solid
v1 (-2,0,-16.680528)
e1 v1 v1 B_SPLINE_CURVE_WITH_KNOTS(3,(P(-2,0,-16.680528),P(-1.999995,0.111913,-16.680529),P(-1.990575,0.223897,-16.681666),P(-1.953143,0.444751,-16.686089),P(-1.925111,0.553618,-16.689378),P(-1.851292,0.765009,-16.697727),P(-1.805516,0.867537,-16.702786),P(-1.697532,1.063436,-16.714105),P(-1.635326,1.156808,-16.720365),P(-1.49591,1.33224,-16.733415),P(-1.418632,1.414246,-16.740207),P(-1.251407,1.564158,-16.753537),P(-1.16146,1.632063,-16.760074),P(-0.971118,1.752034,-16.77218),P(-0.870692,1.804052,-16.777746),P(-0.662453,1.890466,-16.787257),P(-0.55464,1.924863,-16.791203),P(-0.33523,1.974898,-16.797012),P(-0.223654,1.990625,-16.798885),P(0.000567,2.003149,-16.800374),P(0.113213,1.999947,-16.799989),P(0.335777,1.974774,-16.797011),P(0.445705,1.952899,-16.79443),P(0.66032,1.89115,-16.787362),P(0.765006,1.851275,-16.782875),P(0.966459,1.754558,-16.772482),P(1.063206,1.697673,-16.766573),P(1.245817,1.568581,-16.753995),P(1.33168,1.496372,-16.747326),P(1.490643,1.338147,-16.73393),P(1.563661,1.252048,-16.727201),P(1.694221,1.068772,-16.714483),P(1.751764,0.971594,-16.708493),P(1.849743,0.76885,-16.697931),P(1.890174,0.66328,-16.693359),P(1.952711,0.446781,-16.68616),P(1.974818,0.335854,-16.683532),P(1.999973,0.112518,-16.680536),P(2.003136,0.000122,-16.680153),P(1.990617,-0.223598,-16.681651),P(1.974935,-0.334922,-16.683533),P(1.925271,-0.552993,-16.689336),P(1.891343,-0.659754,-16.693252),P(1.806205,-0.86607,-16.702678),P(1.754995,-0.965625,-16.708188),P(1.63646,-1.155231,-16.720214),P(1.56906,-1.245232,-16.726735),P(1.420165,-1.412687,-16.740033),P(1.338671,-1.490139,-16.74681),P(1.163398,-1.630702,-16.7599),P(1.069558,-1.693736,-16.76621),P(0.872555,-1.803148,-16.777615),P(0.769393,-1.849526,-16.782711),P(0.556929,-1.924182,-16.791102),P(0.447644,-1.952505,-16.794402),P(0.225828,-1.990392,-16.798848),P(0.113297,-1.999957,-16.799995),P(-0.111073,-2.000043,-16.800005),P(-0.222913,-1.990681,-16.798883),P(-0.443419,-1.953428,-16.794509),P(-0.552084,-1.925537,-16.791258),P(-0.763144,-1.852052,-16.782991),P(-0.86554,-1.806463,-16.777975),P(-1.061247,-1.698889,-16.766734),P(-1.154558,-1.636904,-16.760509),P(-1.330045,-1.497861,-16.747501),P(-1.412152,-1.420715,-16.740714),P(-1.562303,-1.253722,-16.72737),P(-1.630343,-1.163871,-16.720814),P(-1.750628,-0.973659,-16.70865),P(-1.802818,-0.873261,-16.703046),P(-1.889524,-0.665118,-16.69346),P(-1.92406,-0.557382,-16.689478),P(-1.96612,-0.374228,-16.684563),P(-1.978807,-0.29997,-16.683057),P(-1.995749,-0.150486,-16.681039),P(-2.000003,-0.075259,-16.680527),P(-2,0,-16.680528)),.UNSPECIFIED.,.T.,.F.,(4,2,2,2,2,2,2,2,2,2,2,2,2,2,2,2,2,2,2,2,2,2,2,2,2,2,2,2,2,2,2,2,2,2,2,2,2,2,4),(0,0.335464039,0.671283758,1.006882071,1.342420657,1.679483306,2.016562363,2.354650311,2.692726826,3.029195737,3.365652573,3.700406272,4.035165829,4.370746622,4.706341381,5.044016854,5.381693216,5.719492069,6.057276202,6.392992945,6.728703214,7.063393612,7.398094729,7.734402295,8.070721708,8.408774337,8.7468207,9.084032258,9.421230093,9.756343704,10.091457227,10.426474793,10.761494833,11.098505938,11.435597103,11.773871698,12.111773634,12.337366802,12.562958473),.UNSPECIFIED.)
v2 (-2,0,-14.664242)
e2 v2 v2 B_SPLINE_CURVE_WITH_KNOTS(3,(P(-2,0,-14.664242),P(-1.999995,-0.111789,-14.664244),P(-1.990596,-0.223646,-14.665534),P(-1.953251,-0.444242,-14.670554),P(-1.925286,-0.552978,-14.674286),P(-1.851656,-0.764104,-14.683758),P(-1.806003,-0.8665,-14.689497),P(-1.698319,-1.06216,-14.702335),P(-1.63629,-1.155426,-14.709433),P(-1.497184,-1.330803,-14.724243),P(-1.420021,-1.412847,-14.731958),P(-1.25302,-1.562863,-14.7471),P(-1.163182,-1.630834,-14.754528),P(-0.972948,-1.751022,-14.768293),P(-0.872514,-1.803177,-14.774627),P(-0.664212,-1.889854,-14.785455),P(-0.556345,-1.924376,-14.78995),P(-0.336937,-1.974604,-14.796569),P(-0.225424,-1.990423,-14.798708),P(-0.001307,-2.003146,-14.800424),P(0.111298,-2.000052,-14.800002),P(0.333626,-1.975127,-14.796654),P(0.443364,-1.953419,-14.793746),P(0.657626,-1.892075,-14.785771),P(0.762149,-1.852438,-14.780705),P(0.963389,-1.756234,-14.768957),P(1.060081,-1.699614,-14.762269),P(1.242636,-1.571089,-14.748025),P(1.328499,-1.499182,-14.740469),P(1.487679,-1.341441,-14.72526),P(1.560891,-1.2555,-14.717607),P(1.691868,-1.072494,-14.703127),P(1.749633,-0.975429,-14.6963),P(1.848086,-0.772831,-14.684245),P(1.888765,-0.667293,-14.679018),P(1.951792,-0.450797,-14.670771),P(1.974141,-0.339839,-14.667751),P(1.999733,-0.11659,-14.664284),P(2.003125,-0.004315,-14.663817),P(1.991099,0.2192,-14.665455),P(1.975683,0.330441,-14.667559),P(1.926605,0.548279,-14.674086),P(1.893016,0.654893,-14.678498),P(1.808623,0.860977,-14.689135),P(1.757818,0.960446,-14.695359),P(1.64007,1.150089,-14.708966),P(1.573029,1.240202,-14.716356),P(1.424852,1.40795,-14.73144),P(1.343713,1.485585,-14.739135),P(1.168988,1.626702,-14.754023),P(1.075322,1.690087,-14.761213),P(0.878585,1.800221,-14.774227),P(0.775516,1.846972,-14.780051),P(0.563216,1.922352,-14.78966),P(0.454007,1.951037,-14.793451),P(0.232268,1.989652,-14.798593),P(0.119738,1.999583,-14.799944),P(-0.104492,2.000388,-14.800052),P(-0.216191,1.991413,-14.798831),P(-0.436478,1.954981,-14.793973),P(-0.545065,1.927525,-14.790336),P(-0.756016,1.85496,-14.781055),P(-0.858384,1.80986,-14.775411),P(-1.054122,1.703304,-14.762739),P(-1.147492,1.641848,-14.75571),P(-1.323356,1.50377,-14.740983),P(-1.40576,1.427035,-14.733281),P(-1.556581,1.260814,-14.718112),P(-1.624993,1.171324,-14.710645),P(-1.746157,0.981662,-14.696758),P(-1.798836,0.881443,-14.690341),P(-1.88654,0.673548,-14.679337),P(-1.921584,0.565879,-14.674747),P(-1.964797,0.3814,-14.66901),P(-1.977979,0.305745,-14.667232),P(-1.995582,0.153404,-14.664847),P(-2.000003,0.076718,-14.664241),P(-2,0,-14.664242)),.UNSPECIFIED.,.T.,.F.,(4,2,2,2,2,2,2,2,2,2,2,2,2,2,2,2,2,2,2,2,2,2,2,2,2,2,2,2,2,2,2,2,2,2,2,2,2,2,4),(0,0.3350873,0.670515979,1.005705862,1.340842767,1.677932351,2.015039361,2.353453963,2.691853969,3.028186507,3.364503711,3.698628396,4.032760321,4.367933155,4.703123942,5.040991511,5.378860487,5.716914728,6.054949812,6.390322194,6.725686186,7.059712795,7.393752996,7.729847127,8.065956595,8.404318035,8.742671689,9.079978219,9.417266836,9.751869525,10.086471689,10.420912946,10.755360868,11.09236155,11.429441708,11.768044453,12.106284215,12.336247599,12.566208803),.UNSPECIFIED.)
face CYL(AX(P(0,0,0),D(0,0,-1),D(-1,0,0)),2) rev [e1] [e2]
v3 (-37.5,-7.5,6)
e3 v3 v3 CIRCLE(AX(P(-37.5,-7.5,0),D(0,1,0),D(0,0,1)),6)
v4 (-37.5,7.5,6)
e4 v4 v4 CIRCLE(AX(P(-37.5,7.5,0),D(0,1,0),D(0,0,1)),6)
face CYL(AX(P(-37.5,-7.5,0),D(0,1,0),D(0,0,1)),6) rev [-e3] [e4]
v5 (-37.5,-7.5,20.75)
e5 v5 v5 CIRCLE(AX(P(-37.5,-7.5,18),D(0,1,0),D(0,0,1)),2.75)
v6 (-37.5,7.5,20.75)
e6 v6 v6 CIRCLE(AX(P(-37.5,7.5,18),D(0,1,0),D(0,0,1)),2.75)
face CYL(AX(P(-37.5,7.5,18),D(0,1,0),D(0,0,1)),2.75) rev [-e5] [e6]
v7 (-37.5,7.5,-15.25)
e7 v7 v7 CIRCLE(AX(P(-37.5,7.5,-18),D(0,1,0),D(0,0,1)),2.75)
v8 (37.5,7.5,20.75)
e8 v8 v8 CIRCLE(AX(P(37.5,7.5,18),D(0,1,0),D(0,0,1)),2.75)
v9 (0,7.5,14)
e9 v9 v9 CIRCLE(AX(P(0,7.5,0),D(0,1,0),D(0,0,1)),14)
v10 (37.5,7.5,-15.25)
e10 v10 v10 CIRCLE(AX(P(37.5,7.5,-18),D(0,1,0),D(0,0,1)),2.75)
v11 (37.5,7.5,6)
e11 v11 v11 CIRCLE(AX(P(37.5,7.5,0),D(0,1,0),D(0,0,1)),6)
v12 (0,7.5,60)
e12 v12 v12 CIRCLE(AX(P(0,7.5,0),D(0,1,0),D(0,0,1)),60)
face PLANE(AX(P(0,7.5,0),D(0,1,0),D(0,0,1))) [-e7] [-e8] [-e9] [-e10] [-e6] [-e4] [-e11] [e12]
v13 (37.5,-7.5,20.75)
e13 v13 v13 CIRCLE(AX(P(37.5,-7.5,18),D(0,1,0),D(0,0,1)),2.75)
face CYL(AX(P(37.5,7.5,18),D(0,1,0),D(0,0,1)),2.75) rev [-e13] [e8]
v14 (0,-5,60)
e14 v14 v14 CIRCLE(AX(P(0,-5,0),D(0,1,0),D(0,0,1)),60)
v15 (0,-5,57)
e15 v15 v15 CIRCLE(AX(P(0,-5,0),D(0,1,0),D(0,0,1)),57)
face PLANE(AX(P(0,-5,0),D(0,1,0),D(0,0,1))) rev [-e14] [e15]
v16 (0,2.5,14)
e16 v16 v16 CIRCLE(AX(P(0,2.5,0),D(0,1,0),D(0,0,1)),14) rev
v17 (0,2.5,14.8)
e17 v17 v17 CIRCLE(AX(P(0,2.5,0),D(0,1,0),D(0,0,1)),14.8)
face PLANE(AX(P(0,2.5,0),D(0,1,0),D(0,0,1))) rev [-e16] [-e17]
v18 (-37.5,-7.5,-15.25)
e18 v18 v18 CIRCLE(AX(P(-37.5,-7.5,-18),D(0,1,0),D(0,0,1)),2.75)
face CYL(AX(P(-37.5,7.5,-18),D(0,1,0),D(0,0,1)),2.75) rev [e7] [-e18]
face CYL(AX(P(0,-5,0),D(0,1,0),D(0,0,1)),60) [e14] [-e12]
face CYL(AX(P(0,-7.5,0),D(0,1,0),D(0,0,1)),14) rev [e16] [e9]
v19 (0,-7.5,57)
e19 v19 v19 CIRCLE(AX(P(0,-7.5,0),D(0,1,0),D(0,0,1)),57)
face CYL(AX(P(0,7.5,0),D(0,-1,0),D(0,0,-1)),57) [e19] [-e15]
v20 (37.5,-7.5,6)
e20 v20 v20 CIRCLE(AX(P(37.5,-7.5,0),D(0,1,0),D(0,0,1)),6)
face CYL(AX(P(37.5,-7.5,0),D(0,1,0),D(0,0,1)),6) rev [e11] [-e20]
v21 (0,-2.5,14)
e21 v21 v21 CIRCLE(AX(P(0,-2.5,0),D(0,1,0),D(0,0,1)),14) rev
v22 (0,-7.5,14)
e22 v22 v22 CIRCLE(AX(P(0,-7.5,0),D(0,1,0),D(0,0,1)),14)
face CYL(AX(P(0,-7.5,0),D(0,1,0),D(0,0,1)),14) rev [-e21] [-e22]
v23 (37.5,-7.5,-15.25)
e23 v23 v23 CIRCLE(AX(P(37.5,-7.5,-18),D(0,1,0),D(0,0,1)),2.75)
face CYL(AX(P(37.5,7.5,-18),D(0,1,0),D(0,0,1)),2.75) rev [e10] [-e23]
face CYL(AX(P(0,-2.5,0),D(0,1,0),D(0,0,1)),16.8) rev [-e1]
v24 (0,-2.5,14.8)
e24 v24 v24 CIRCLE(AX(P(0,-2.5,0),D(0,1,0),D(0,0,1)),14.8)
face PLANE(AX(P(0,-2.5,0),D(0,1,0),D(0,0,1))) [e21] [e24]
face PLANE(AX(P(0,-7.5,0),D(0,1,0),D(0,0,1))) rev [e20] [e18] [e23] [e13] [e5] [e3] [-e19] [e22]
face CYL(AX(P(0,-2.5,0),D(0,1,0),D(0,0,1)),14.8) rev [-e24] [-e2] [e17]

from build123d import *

# Parameters (mm, degrees)
SKETCH1_R            = 57
EXTRUDE4_DEPTH       = 7.5
EXTRUDE5_DEPTH       = 7.5
EXTRUDE5_DEPTH_BACK  = 5
SKETCH_R             = 60
SKETCH_R_2           = 57
SKETCH2_R            = 6
SKETCH2_R_2          = 14
EXTRUDE6_DEPTH       = 87.168439698
M5_CLEARANCE_HOLE1_D = 5.5
SKETCH6_R            = 14.8
EXTRUDE7_DEPTH       = 2.5
EXTRUDE8_START       = -16.8000001
EXTRUDE8_OUTLINE_R   = 2
EXTRUDE8_DEPTH       = 2.135757978
EXTRUDE8_START_2     = -3
EXTRUDE8_2_DEPTH     = 6


with BuildPart() as part:
    # Sketch1 → Extrude4 (new, symmetric)
    with BuildSketch(Plane(origin=(0, 0, 0), x_dir=(1, 0, 0), z_dir=(0, 1, 0))):
        with Locations(Location((0, 0, 0), (0, 0, 270))):
            Circle(SKETCH1_R)
    extrude(amount=EXTRUDE4_DEPTH, both=True)

    # Sketch → Extrude5 (add, two sides: drawn at the far end of the back side and taken through both)
    with BuildSketch(Plane(origin=(0, 0, 0), x_dir=(1, 0, 0), z_dir=(0, 1, 0)).offset(-EXTRUDE5_DEPTH_BACK)):
        with Locations(Location((0, 0, 0), (0, 0, 270))):
            Circle(SKETCH_R)
        with Locations(Location((0, 0, 0), (0, 0, 270))):
            Circle(SKETCH_R_2, mode=Mode.SUBTRACT)
    extrude(amount=EXTRUDE5_DEPTH + EXTRUDE5_DEPTH_BACK)

    # Sketch2 → Extrude6 (cut, through all)
    with BuildSketch(Plane(origin=(0, 7.5, 0), x_dir=(1, 0, 0), z_dir=(0, 1, 0))):
        with Locations(Location((-37.5, 0, 0), (0, 0, 270))):
            Circle(SKETCH2_R)
        with Locations(Location((37.5, 0, 0), (0, 0, 270))):
            Circle(SKETCH2_R)
        with Locations(Location((0, 0, 0), (0, 0, 270))):
            Circle(SKETCH2_R_2)
    extrude(amount=-EXTRUDE6_DEPTH, mode=Mode.SUBTRACT)

    # M5 Clearance Hole1 (through all)
    with Locations(Plane(origin=(0, 7.5, 0), x_dir=(1, 0, 0), z_dir=(0, 1, 0))):
        with Locations((37.5, 18), (37.5, -18), (-37.5, 18), (-37.5, -18)):
            Hole(M5_CLEARANCE_HOLE1_D / 2)

    # Sketch6 → Extrude7 (cut, symmetric)
    with BuildSketch(Plane(origin=(0, 0, 0), x_dir=(1, 0, 0), z_dir=(0, 1, 0))):
        with Locations(Location((0, 0, 0), (0, 0, 270))):
            Circle(SKETCH6_R)
    extrude(amount=EXTRUDE7_DEPTH, both=True, mode=Mode.SUBTRACT)

    # Extrude8: read off the stored shape, not the designer's step
    # Extrude8 outline → Extrude8 (cut)
    with BuildSketch(Plane.XY.offset(EXTRUDE8_START)):
        Circle(EXTRUDE8_OUTLINE_R)
    extrude(amount=EXTRUDE8_DEPTH, mode=Mode.SUBTRACT)

    # Extrude8 2 outline → Extrude8 2 (add)
    with BuildSketch(Plane(origin=(0, 0, 0), x_dir=(1, 0, 0), z_dir=(0, 1, 0)).offset(EXTRUDE8_START_2)):
        with BuildLine():
            ThreePointArc((-2e-09, 16.8), (1.002059984, 16.770088723), (2.000551768, 16.680461403))
            Line((2.000551768, 16.680461403), (3, 16.56059374))
            Line((3, 16.56059374), (3, 16.8000001))
            Line((3, 16.8000001), (-2e-09, 16.8))
        make_face()
        with BuildLine():
            ThreePointArc((-2.000001192, 16.680527427), (-1.001783219, 16.770105259), (-2e-09, 16.8))
            Line((-2e-09, 16.8), (-3, 16.8000001))
            Line((-3, 16.8000001), (-3, 16.560627213))
            Line((-3, 16.560627213), (-2.000001192, 16.680527427))
        make_face()
    extrude(amount=EXTRUDE8_2_DEPTH)


solid = part.part
